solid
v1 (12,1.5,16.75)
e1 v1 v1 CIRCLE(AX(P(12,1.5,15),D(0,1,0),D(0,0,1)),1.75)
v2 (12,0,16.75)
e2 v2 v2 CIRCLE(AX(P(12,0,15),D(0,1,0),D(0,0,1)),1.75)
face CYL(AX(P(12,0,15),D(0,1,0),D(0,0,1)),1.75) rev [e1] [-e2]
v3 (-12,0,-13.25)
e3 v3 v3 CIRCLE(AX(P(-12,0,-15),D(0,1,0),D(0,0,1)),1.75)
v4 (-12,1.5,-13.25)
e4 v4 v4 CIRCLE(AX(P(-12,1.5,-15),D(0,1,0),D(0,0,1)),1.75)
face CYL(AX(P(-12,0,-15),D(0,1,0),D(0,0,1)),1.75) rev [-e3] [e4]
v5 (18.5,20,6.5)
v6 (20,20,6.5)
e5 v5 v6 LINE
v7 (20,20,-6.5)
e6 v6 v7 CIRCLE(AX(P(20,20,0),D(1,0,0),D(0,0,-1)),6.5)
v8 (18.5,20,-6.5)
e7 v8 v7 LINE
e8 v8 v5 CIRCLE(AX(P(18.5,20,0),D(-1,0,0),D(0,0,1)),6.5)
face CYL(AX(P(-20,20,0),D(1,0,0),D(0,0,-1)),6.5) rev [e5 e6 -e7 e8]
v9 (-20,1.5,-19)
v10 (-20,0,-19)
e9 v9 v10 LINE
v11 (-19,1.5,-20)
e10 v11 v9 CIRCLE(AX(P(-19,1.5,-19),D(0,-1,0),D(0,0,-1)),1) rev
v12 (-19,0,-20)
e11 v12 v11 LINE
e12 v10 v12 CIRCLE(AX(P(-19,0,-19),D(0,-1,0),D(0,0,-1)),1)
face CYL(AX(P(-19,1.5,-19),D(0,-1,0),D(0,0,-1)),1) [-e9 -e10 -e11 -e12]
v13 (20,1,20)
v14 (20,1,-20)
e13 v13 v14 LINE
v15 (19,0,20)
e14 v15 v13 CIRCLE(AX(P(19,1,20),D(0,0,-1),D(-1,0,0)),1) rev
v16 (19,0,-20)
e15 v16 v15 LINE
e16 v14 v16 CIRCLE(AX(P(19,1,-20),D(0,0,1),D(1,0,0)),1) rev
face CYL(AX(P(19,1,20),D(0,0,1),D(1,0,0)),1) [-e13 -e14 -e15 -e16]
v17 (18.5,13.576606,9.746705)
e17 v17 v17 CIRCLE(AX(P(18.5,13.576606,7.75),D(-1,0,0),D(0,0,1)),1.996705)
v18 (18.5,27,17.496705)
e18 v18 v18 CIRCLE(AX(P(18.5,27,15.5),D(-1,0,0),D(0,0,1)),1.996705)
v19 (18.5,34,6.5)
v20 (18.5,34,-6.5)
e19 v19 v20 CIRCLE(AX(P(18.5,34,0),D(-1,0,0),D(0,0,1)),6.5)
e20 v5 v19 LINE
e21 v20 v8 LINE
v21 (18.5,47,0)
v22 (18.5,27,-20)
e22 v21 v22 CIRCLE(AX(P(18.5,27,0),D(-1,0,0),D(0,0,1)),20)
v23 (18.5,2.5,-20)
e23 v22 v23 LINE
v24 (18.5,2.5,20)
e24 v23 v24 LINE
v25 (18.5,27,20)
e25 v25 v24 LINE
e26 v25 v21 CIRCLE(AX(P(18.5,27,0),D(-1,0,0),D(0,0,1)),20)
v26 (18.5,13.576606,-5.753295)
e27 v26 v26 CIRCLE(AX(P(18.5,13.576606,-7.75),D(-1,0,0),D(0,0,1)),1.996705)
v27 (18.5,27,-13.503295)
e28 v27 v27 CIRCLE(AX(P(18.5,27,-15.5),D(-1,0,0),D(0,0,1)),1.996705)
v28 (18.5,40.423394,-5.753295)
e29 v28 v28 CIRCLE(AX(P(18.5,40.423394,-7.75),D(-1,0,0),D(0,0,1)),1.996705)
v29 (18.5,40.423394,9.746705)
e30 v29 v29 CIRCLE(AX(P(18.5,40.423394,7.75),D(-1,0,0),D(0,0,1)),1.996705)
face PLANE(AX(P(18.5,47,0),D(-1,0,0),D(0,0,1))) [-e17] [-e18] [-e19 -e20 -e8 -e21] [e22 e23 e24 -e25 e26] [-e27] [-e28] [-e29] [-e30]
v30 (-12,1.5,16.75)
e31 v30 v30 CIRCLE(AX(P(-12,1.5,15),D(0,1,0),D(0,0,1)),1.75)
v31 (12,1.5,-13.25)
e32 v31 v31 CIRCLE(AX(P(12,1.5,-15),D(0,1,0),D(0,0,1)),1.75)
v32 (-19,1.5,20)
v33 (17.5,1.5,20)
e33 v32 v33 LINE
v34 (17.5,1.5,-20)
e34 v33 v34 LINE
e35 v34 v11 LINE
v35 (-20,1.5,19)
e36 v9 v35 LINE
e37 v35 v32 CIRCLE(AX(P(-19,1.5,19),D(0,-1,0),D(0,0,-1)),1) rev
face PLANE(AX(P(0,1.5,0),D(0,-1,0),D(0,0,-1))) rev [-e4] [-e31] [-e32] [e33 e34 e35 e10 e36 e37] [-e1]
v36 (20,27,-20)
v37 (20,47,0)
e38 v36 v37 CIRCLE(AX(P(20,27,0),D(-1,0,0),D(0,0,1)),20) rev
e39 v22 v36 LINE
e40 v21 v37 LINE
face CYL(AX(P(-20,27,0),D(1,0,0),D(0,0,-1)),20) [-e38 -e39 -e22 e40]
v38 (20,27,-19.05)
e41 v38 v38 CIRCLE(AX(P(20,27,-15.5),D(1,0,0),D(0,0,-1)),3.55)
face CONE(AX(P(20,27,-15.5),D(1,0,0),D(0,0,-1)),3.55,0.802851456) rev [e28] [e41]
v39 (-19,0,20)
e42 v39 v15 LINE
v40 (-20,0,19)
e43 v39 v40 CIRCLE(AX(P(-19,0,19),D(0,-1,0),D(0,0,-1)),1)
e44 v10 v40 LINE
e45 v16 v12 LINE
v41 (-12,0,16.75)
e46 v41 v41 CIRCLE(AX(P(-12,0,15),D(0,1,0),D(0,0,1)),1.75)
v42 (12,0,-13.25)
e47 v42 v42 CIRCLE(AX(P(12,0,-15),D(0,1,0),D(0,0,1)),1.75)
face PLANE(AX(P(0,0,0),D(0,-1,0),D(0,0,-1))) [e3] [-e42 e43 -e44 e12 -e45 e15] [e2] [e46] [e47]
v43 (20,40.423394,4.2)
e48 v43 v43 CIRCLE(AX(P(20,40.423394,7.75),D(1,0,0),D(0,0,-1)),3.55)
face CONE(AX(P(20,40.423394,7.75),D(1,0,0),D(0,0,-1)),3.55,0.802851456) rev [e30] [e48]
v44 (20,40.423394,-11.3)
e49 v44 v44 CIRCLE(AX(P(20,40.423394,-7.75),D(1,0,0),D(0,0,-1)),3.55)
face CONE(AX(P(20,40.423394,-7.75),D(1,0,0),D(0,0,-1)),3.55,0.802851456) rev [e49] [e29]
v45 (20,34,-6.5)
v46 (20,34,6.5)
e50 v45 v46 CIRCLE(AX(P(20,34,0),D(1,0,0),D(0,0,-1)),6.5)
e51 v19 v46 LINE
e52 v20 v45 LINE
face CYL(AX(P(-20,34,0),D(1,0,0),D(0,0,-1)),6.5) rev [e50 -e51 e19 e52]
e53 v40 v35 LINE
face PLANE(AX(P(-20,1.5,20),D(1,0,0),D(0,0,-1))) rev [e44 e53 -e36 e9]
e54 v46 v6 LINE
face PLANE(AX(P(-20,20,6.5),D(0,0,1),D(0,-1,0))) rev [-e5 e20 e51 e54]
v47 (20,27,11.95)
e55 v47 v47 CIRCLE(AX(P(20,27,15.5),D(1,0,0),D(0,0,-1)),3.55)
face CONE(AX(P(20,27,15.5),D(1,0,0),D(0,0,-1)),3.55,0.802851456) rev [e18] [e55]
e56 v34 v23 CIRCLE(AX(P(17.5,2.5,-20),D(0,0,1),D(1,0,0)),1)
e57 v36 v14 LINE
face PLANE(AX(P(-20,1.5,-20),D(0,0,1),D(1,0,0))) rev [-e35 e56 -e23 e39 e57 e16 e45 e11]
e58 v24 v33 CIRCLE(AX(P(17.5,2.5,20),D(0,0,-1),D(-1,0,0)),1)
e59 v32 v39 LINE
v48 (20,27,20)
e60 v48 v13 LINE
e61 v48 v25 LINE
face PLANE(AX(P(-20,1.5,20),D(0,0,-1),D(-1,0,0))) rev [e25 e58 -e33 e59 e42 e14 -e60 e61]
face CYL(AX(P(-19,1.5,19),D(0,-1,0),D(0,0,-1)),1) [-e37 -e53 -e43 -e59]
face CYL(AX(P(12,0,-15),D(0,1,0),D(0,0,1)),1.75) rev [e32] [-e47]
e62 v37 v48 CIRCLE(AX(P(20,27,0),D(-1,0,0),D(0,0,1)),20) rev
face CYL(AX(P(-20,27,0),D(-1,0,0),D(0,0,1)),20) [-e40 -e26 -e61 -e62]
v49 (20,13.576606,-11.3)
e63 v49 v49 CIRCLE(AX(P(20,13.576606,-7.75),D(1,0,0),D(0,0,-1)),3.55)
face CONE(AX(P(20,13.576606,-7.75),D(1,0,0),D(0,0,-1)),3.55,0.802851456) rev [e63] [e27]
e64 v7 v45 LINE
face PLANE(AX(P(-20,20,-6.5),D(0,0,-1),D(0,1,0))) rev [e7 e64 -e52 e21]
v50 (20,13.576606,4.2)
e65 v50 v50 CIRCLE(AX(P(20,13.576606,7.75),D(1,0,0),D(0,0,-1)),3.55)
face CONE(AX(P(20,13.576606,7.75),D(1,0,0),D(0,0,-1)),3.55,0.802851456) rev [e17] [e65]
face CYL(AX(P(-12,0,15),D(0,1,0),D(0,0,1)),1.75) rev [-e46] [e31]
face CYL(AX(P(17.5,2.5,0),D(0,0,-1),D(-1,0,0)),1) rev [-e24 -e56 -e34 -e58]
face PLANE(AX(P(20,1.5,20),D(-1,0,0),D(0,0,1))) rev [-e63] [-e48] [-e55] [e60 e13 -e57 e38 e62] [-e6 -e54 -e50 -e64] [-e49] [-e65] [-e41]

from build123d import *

# Parameters (mm, degrees)
SKETCH_1_W                   = 40
SKETCH_1_H                   = 40
EXTRUDE_1_DEPTH              = 1.5
SKETCH_2_R                   = 1.75
CUT_EXTRUDE_1_DEPTH          = 29.324018077
EXTRUDE_START                = -1.5
SKETCH_3_W                   = 1.5
SKETCH_3_H                   = 40
EXTRUDE_2_DEPTH              = 47
SKETCH_4_R                   = 1.5
CUT_EXTRUDE_2_DEPTH          = 65.876806333
HOLE_WIZARD_M3_1_D           = 3.4
HOLE_WIZARD_M3_1_DEPTH       = 15
HOLE_WIZARD_M3_1_CSINK_D     = 7.1
HOLE_WIZARD_M3_1_CSINK_ANGLE = 92
HOLE_WIZARD_M3_1_TIP         = 1.021463052
FILLET_1_R                   = 20
FILLET_2_R                   = 1


with BuildPart() as part:
    # 스케치1 → 보스-돌출1 (new body)
    with BuildSketch(Plane(origin=(0, 0, 0), x_dir=(1, 0, 0), z_dir=(0, 1, 0))):
        Rectangle(SKETCH_1_W, SKETCH_1_H)
    extrude(amount=EXTRUDE_1_DEPTH)

    # 스케치2 → 컷-돌출1 (cut, through all)
    with BuildSketch(Plane(origin=(0, 1.5, 0), x_dir=(1, 0, 0), z_dir=(0, 1, 0))):
        with Locations(Location((-12, 15, 0), (0, 0, 270))):
            Circle(SKETCH_2_R)
        with Locations(Location((12, 15, 0), (0, 0, 270))):
            Circle(SKETCH_2_R)
        with Locations(Location((-12, -15, 0), (0, 0, 270))):
            Circle(SKETCH_2_R)
        with Locations(Location((12, -15, 0), (0, 0, 270))):
            Circle(SKETCH_2_R)
    extrude(amount=-CUT_EXTRUDE_1_DEPTH, mode=Mode.SUBTRACT)

    # 스케치3 → 보스-돌출2 (add)
    with BuildSketch(Plane(origin=(0, 1.5, 0), x_dir=(1, 0, 0), z_dir=(0, 1, 0)).offset(EXTRUDE_START)):
        with Locations((19.25, 0)):
            Rectangle(SKETCH_3_W, SKETCH_3_H)
    extrude(amount=EXTRUDE_2_DEPTH)

    # 스케치4 → 컷-돌출2 (cut, through all)
    with BuildSketch(Plane(origin=(20, 0, 0), x_dir=(0, 0, -1), z_dir=(1, 0, 0))):
        with Locations((15.5, 27)):
            Circle(SKETCH_4_R)
        with Locations((7.75, 13.576606241)):
            Circle(SKETCH_4_R)
        with Locations((-7.75, 13.576606241)):
            Circle(SKETCH_4_R)
        with Locations((-15.5, 27)):
            Circle(SKETCH_4_R)
        with Locations((-7.75, 40.423393759)):
            Circle(SKETCH_4_R)
        with Locations((7.75, 40.423393759)):
            Circle(SKETCH_4_R)
        with BuildLine():
            Line((-6.5, 20), (-6.5, 34))
            ThreePointArc((-6.5, 34), (0, 40.5), (6.5, 34))
            Line((6.5, 34), (6.5, 20))
            ThreePointArc((6.5, 20), (0, 13.5), (-6.5, 20))
        make_face()
    extrude(amount=-CUT_EXTRUDE_2_DEPTH, mode=Mode.SUBTRACT)

    # M3 둥근 십자머리 나사용 카운터싱크1
    with Locations(Plane(origin=(20, 0, 0), x_dir=(0, 0, -1), z_dir=(1, 0, 0))):
        with Locations((15.5, 27), (7.75, 40.423393759), (-7.75, 40.423393759), (-15.5, 27), (-7.75, 13.576606241), (7.75, 13.576606241)):
            CounterSinkHole(HOLE_WIZARD_M3_1_D / 2, HOLE_WIZARD_M3_1_CSINK_D / 2, depth=HOLE_WIZARD_M3_1_DEPTH, counter_sink_angle=HOLE_WIZARD_M3_1_CSINK_ANGLE)
            with Locations((0, 0, -(HOLE_WIZARD_M3_1_DEPTH + HOLE_WIZARD_M3_1_TIP / 2))):  # 118° drill point
                Cone(0, HOLE_WIZARD_M3_1_D / 2, HOLE_WIZARD_M3_1_TIP, mode=Mode.SUBTRACT)

    # 필렛1
    fillet_1_edges = [part.edges().sort_by_distance(p)[0] for p in [
        (19.25, 47, -20),
        (19.25, 47, 20),
    ]]
    fillet(fillet_1_edges, radius=FILLET_1_R - 0.0001)  # a hair under: the kernel refuses the full size

    # 필렛2
    fillet_2_edges = [part.edges().sort_by_distance(p)[0] for p in [
        (18.5, 1.5, 0),
        (20, 0, 0),
        (-20, 0.75, 20),
        (-20, 0.75, -20),
    ]]
    fillet(fillet_2_edges, radius=FILLET_2_R)


solid = part.part
